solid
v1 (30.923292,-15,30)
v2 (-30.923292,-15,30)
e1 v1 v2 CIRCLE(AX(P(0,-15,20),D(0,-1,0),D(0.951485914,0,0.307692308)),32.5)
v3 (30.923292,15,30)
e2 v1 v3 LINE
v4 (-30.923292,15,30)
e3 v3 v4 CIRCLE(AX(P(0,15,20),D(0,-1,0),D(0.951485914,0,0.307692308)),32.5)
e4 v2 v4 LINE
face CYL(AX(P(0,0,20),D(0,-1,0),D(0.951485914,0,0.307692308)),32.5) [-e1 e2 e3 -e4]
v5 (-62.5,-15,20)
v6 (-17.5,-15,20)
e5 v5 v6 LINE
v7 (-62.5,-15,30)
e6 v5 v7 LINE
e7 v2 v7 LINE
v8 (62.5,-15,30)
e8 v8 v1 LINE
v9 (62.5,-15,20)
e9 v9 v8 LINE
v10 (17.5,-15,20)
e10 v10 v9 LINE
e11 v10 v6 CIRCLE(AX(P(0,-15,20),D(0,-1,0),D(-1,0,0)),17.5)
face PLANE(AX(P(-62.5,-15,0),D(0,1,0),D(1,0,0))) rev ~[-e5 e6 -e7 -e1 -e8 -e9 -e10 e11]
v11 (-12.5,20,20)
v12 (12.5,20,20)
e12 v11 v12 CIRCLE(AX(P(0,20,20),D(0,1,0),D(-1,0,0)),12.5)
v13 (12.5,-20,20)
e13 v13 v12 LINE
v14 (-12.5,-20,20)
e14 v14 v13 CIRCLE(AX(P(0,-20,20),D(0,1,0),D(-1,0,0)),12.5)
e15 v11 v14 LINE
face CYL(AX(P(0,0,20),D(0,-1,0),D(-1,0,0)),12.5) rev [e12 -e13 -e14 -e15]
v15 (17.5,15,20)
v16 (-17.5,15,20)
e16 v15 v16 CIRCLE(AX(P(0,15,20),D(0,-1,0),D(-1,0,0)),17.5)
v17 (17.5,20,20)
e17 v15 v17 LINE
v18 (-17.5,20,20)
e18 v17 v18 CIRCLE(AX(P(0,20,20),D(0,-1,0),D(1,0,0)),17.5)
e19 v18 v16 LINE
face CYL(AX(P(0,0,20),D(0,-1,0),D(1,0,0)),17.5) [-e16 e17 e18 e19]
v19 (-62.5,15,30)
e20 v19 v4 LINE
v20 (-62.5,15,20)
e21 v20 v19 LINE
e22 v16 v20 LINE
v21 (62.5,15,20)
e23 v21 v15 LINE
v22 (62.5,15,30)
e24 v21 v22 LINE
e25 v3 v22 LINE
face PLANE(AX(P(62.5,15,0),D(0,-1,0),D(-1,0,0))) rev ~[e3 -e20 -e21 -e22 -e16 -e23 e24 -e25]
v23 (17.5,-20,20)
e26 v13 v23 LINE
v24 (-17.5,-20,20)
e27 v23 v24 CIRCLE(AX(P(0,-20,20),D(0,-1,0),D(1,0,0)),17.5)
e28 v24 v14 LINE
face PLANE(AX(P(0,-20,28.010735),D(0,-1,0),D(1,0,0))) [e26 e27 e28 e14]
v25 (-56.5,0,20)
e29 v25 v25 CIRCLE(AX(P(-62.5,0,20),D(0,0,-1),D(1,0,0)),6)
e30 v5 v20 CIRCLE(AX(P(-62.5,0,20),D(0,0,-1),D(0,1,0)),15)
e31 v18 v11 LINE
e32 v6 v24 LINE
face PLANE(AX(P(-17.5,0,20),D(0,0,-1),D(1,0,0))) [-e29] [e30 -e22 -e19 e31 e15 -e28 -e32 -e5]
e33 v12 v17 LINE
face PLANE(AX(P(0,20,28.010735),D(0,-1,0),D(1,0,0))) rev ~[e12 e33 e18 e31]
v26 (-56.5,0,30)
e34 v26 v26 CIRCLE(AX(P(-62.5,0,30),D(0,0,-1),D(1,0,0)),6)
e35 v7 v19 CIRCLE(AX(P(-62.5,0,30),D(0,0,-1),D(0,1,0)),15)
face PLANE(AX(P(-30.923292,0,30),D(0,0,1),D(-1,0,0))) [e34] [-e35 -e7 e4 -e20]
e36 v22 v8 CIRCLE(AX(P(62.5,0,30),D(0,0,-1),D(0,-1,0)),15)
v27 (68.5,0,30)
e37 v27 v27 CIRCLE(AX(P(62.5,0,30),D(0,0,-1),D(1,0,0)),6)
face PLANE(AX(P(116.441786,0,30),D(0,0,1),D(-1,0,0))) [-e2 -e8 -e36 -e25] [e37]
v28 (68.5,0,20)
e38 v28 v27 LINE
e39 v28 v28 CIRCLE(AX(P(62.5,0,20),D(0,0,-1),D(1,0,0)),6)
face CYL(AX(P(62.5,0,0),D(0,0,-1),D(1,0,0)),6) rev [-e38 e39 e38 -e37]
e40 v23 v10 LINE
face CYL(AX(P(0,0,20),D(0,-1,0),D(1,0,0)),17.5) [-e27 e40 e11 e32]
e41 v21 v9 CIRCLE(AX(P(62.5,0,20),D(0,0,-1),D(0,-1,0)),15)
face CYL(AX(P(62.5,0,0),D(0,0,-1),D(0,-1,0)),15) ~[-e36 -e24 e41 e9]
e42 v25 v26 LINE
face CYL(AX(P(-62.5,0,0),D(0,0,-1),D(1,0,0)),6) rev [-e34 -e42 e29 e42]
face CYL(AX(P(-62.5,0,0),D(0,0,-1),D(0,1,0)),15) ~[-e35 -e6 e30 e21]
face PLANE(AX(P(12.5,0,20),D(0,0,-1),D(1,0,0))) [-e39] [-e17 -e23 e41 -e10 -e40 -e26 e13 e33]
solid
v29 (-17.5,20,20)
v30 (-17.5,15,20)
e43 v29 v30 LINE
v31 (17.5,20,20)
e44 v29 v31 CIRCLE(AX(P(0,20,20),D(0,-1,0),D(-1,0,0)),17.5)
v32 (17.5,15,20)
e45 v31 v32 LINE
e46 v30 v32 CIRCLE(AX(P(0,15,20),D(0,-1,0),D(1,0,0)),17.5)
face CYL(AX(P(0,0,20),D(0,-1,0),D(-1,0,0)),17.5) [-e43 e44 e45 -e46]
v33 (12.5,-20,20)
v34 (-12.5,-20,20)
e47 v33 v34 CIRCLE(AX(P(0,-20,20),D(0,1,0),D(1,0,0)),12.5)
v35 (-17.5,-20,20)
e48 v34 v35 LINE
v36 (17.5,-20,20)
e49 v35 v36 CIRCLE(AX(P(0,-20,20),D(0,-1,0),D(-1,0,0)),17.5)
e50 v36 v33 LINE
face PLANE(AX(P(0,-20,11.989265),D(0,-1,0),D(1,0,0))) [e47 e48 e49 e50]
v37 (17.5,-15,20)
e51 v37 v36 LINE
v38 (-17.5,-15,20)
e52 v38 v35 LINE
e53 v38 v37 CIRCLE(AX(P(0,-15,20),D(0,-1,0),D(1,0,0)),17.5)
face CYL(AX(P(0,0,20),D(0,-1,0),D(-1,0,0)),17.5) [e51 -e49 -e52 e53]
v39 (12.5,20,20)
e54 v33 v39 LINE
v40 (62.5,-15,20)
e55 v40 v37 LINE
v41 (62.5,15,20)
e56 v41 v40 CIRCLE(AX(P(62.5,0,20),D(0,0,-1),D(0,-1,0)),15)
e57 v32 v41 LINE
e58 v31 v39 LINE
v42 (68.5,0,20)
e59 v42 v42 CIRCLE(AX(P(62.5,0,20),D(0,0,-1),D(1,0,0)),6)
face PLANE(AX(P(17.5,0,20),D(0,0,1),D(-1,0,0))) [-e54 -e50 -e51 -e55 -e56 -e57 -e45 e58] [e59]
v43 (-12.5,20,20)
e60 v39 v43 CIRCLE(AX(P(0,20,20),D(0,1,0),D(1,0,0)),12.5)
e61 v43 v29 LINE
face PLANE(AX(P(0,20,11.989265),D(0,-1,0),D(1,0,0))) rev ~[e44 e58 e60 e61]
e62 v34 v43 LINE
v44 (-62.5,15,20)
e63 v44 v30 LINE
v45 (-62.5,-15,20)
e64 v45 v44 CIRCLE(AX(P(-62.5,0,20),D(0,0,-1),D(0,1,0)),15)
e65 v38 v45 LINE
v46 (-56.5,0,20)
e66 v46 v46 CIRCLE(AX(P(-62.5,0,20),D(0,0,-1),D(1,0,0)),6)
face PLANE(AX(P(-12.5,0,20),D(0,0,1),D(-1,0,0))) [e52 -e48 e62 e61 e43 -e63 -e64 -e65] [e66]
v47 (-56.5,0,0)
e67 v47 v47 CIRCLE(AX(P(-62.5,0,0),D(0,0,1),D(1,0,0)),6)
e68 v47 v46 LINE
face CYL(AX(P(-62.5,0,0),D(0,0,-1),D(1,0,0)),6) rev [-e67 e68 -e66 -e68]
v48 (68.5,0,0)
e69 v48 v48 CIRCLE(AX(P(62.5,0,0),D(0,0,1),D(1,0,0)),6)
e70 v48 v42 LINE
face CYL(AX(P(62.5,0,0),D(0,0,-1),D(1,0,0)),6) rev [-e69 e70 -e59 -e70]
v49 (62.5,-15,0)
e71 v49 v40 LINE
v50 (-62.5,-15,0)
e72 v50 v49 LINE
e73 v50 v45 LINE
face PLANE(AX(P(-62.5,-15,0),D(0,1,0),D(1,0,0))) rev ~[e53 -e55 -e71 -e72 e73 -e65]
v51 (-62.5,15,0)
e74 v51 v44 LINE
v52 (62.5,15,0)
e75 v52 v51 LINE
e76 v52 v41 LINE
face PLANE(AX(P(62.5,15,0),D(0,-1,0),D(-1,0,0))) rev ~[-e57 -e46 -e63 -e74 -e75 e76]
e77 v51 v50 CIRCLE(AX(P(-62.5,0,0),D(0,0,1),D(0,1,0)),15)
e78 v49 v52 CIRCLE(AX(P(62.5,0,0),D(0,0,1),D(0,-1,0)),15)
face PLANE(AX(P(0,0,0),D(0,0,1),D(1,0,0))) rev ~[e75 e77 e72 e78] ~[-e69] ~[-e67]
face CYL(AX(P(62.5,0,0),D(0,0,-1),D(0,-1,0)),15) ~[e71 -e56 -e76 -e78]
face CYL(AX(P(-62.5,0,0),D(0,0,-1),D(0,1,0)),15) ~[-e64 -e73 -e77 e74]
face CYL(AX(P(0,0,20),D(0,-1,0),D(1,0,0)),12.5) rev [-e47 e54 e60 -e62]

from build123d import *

# Parameters (mm, degrees)
F2_DEPTH = 21.5
F3_DEPTH = 23.9
F1_R     = 6
F4_DEPTH = 69.6
F5_DEPTH = 20
F6_DEPTH = 20


with BuildPart() as f2:
    # F0 (on Front) → F2 (new body, symmetric)
    with BuildSketch(Plane.XZ):
        with BuildLine():
            Line((-116.4417862892, 0), (0, 0))
            Line((0, 0), (116.4417862892, 0))
            Line((116.4417862892, 0), (116.4417862892, 20))
            Line((116.4417862892, 20), (17.5, 20))
            ThreePointArc((17.5, 20), (0, 2.5), (-17.5, 20))
            Line((-17.5, 20), (-116.4417862892, 20))
            Line((-116.4417862892, 20), (-116.4417862892, 0))
        make_face()
    extrude(amount=F2_DEPTH, both=True)


with BuildPart() as f3:
    # F0 (on Front) → F3 (new body, symmetric)
    with BuildSketch(Plane.XZ):
        with BuildLine():
            Line((-116.4417862892, 30), (-116.4417862892, 20))
            Line((-116.4417862892, 20), (-17.5, 20))
            ThreePointArc((-17.5, 20), (0, 37.5), (17.5, 20))
            Line((17.5, 20), (116.4417862892, 20))
            Line((116.4417862892, 20), (116.4417862892, 30))
            Line((116.4417862892, 30), (30.9232921921, 30))
            ThreePointArc((30.9232921921, 30), (0, 52.5), (-30.9232921921, 30))
            Line((-30.9232921921, 30), (-116.4417862892, 30))
        make_face()
    extrude(amount=F3_DEPTH, both=True)


with BuildPart() as f4_tool:
    # F1 (on Top) → F4 (new body)
    with BuildSketch(Plane.XY):
        with BuildLine():
            Line((62.5, 15), (-62.5, 15))
            ThreePointArc((-62.5, 15), (-77.5, 0), (-62.5, -15))
            Line((-62.5, -15), (62.5, -15))
            ThreePointArc((62.5, -15), (77.5, 0), (62.5, 15))
        make_face()
        with Locations((-62.5, 0)):
            Circle(F1_R, mode=Mode.SUBTRACT)
        with Locations((62.5, 0)):
            Circle(F1_R, mode=Mode.SUBTRACT)
    extrude(amount=F4_DEPTH)


with BuildPart() as f2_1:
    add(f2.part)

    # F4: intersect by f4_tool
    add(f4_tool.part, mode=Mode.INTERSECT)

    # F0 (on Front) → F5 (join, symmetric)
    with BuildSketch(Plane.XZ):
        with BuildLine():
            Line((-12.5, 20), (-17.5, 20))
            ThreePointArc((-17.5, 20), (0, 2.5), (17.5, 20))
            Line((17.5, 20), (12.5, 20))
            ThreePointArc((12.5, 20), (0, 7.5), (-12.5, 20))
        make_face()
    extrude(amount=F5_DEPTH, both=True)


with BuildPart() as f3_1:
    add(f3.part)

    # F4: intersect by f4_tool
    add(f4_tool.part, mode=Mode.INTERSECT)

    # F0 (on Front) → F6 (join, symmetric)
    with BuildSketch(Plane.XZ):
        with BuildLine():
            ThreePointArc((17.5, 20), (0, 37.5), (-17.5, 20))
            Line((-17.5, 20), (-12.5, 20))
            ThreePointArc((-12.5, 20), (0, 32.5), (12.5, 20))
            Line((12.5, 20), (17.5, 20))
        make_face()
    extrude(amount=F6_DEPTH, both=True)


solid = Compound([f2_1.part, f3_1.part])
